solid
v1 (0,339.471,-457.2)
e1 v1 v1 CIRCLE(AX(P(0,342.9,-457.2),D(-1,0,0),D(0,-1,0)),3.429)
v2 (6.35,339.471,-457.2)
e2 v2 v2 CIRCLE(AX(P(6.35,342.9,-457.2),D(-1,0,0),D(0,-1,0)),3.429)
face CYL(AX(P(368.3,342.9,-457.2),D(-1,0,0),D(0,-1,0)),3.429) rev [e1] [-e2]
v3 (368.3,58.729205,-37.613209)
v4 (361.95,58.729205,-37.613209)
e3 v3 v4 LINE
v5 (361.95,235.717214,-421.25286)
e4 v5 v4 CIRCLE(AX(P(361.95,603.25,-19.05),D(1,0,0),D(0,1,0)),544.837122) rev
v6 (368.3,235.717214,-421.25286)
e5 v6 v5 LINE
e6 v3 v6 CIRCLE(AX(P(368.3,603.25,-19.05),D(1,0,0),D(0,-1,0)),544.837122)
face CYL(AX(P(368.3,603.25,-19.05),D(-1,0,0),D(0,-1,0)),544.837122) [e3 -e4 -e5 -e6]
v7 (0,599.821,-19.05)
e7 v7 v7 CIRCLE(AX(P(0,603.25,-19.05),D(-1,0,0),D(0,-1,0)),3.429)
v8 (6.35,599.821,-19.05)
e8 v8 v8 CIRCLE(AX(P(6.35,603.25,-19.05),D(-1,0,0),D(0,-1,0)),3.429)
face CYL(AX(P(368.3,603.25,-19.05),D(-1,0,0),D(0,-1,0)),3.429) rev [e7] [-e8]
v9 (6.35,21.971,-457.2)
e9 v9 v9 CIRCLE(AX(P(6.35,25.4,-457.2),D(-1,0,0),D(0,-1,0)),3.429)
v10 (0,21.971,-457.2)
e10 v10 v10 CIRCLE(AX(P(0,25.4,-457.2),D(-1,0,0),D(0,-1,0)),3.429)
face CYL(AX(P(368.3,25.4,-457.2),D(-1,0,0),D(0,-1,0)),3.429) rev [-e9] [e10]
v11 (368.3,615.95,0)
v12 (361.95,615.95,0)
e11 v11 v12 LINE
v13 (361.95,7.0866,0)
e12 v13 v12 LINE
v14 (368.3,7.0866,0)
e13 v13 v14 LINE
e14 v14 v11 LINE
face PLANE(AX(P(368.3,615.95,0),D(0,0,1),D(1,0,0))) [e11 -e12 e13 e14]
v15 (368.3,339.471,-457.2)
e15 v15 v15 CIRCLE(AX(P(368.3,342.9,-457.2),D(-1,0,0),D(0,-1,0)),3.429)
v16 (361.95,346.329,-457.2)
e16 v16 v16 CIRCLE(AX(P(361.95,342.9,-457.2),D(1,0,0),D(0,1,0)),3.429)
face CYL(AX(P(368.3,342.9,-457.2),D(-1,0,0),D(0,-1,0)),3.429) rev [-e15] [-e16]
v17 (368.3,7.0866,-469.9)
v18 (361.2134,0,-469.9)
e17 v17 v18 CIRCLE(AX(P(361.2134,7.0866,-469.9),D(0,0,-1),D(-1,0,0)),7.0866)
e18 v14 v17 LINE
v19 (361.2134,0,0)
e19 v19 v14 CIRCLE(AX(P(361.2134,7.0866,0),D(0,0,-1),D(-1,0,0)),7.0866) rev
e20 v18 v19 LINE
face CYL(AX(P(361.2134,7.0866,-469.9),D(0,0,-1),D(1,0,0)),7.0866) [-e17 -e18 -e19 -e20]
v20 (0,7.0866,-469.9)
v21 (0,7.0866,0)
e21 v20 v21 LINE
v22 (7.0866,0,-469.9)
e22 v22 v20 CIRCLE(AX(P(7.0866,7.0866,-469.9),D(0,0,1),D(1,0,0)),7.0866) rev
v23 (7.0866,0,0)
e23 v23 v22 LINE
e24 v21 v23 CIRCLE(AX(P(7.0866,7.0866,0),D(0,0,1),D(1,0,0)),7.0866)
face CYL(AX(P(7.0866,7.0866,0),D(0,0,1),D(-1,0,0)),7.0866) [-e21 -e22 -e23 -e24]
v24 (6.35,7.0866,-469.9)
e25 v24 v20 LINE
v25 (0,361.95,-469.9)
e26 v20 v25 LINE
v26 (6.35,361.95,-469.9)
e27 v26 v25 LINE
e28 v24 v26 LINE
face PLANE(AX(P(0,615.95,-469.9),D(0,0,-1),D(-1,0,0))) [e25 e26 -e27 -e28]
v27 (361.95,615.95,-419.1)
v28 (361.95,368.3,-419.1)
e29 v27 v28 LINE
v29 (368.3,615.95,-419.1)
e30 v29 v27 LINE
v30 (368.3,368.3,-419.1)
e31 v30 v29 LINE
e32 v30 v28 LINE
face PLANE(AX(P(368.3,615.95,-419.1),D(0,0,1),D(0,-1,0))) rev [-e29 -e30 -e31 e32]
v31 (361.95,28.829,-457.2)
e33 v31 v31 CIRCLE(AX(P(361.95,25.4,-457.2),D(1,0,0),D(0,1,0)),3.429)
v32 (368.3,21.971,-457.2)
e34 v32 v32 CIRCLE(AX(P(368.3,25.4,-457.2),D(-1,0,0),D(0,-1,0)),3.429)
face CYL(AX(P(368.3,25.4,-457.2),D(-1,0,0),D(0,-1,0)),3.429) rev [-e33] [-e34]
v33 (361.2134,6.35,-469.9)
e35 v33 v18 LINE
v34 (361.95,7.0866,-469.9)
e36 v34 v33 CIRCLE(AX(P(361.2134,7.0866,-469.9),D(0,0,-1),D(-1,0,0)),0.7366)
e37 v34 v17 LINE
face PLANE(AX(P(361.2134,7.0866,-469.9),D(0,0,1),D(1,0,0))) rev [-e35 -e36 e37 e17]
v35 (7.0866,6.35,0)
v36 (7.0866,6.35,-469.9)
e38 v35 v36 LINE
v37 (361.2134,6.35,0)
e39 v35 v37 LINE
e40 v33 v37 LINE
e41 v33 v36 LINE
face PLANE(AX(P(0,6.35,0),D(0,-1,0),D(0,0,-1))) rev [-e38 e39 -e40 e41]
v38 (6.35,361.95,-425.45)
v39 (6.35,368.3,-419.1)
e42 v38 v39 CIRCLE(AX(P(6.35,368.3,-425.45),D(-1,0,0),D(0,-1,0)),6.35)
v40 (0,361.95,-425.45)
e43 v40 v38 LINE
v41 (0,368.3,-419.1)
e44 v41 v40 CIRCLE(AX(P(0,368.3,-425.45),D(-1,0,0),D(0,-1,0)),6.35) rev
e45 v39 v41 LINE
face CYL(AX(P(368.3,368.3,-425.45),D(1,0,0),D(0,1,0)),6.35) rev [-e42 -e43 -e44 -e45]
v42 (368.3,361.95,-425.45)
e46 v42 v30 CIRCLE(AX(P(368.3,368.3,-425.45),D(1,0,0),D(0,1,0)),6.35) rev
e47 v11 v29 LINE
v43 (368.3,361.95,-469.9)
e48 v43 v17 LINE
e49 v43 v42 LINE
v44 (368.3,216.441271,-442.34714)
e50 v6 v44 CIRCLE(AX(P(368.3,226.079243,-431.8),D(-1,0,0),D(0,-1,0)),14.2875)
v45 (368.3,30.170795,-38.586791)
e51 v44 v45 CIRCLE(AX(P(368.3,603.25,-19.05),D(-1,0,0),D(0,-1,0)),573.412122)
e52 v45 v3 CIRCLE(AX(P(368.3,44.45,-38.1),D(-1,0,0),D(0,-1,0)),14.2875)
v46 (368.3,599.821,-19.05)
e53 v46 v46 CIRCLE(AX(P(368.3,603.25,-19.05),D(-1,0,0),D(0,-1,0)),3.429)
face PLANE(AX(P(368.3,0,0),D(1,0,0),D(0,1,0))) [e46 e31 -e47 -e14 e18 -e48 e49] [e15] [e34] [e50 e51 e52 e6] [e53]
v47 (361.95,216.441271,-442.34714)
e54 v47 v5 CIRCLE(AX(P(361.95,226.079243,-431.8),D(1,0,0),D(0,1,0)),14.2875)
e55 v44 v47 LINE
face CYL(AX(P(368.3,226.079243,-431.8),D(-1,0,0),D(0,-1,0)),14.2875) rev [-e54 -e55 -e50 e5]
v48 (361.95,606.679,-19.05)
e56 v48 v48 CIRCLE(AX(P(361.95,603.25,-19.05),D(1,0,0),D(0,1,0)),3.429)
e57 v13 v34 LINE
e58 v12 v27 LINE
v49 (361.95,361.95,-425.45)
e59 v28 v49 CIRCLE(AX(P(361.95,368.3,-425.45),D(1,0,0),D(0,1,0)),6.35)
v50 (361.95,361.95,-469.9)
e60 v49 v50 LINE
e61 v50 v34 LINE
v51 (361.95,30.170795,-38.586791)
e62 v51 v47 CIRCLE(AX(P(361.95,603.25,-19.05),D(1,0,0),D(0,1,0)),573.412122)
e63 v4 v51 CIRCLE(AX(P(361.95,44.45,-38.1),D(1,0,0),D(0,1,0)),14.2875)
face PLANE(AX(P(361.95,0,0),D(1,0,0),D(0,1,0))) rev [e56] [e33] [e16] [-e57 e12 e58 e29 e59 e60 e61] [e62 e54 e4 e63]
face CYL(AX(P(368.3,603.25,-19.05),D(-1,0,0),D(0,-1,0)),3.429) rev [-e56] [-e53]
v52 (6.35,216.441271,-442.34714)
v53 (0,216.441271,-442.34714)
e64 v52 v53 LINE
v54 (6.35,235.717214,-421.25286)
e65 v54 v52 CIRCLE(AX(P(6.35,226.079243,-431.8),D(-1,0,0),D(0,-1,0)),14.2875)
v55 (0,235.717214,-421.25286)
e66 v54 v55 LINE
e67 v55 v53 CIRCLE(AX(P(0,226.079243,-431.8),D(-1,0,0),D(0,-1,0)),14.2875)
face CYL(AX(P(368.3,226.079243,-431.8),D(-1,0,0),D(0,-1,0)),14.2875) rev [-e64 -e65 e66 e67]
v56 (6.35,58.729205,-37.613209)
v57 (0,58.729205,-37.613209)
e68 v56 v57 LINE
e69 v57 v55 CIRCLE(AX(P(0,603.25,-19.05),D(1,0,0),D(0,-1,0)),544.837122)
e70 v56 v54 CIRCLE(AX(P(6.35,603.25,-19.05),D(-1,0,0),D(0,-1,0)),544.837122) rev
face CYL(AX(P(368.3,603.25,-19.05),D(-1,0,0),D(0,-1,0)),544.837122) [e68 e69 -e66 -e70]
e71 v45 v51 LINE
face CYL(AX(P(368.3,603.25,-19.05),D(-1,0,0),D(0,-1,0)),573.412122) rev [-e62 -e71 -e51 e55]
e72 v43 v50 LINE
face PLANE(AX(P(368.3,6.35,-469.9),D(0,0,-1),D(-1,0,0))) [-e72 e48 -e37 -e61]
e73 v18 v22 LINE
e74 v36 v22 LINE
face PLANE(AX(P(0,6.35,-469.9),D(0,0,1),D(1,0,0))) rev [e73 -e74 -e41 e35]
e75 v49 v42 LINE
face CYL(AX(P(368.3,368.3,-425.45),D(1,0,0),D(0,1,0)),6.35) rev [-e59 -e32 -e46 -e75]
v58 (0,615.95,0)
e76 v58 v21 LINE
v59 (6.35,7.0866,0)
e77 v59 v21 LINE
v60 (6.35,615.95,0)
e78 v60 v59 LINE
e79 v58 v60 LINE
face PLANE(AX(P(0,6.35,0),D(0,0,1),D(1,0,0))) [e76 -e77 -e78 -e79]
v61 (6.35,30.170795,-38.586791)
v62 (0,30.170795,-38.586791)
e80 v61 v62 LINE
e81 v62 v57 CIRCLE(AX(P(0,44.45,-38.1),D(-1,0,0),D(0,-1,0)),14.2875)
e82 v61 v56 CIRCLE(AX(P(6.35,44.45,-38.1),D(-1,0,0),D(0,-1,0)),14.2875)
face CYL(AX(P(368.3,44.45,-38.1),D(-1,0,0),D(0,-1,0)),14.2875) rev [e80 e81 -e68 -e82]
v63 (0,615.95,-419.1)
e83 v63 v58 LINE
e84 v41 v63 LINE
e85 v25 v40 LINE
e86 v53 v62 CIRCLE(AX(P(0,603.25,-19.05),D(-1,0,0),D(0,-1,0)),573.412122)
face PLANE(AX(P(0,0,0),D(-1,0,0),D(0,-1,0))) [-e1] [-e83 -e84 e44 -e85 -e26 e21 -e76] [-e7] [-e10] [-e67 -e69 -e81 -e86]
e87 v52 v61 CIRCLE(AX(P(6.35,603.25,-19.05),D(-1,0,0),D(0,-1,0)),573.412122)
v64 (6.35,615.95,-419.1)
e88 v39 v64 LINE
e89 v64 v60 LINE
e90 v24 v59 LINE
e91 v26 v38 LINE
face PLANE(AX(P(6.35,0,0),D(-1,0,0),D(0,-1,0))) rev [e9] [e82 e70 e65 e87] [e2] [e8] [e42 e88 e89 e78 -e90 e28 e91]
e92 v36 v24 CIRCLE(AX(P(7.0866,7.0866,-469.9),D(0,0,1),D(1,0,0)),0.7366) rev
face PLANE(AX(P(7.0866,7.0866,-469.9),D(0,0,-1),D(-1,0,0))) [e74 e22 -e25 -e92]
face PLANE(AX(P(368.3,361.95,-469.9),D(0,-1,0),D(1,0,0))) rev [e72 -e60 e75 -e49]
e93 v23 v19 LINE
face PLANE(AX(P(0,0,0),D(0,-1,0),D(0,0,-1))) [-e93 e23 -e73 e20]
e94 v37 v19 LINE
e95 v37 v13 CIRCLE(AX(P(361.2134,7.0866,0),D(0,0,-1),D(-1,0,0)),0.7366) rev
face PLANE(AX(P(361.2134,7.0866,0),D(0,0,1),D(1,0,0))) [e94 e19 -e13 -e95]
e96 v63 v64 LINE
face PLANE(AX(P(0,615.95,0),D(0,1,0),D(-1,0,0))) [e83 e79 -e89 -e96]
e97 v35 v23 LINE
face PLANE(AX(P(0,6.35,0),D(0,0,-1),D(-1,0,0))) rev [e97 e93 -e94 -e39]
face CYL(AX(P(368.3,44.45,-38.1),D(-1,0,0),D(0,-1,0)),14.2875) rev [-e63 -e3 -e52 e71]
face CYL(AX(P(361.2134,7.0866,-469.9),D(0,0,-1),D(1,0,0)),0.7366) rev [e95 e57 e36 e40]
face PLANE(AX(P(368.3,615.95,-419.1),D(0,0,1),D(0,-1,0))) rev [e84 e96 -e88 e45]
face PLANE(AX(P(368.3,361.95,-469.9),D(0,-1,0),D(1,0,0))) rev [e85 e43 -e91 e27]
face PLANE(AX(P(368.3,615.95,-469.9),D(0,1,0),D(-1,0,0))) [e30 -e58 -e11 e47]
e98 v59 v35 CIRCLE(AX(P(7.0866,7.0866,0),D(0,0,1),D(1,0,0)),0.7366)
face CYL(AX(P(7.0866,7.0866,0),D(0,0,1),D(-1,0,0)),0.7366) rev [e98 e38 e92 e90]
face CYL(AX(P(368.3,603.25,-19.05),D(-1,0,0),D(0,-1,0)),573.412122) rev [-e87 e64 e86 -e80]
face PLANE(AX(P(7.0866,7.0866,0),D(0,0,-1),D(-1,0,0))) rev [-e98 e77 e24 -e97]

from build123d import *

# Parameters (mm, degrees)
SKETCH1_W                    = 368.3
SKETCH1_H                    = 469.9
BASE_FLANGE1_DEPTH           = 6.35
EDGE_FLANGE1_STRIP_W         = 26.8732
EDGE_FLANGE1_STRIP_H         = 6.35
EDGE_FLANGE1_STRIP_CUT_DEPTH = 469.9
EDGE_FLANGE1_DEPTH           = 469.9
EDGE_FLANGE2_STRIP_W         = 26.8732
EDGE_FLANGE2_STRIP_H         = 6.35
EDGE_FLANGE2_STRIP_CUT_DEPTH = 469.9
EDGE_FLANGE2_DEPTH           = 469.9
SKETCH14_R                   = 3.429
SKETCH14_W                   = 50.8
SKETCH14_H                   = 254
CUT_EXTRUDE1_DEPTH           = 858.814258741
FILLET1_R                    = 6.35
CUT_EXTRUDE2_DEPTH           = 858.814258741


# Sheet-metal steps are written as plain solids
with BuildPart() as part:
    # Sketch1 → Base-Flange1 (new body)
    with BuildSketch(Plane(origin=(0, 0, 0), x_dir=(1, 0, 0), z_dir=(0, 1, 0))):
        with Locations((184.15, 234.95)):
            Rectangle(SKETCH1_W, SKETCH1_H)
    extrude(amount=BASE_FLANGE1_DEPTH)

    # Edge-Flange1 strip (across the edge) → Edge-Flange1 strip cut (cut)
    with BuildSketch(Plane(origin=(368.3, 6.35, 0), x_dir=(-1, 0, 0), z_dir=(0, 0, -1))):
        with Locations((-6.35, -3.175)):
            Rectangle(EDGE_FLANGE1_STRIP_W, EDGE_FLANGE1_STRIP_H)
    extrude(amount=EDGE_FLANGE1_STRIP_CUT_DEPTH, mode=Mode.SUBTRACT)

    # Edge-Flange1 section (across the edge) → Edge-Flange1 (add)
    with BuildSketch(Plane(origin=(368.3, 6.35, 0), x_dir=(-1, 0, 0), z_dir=(0, 0, -1))):
        with BuildLine():
            Line((0, 0.7366), (0, 609.6))
            Line((0, 609.6), (6.35, 609.6))
            Line((6.35, 609.6), (6.35, 0.7366))
            ThreePointArc((6.35, 0.7366), (6.565745145, 0.215745145), (7.0866, 0))
            Line((7.0866, 0), (7.0866, -6.35))
            ThreePointArc((7.0866, -6.35), (2.075617084, -4.274382916), (0, 0.7366))
        make_face()
    extrude(amount=EDGE_FLANGE1_DEPTH)

    # Edge-Flange2 strip (across the edge) → Edge-Flange2 strip cut (cut)
    with BuildSketch(Plane(origin=(0, 6.35, -469.9), x_dir=(1, 0, 0), z_dir=(0, 0, 1))):
        with Locations((-6.35, -3.175)):
            Rectangle(EDGE_FLANGE2_STRIP_W, EDGE_FLANGE2_STRIP_H)
    extrude(amount=EDGE_FLANGE2_STRIP_CUT_DEPTH, mode=Mode.SUBTRACT)

    # Edge-Flange2 section (across the edge) → Edge-Flange2 (add)
    with BuildSketch(Plane(origin=(0, 6.35, -469.9), x_dir=(1, 0, 0), z_dir=(0, 0, 1))):
        with BuildLine():
            Line((0, 0.7366), (0, 609.6))
            Line((0, 609.6), (6.35, 609.6))
            Line((6.35, 609.6), (6.35, 0.7366))
            ThreePointArc((6.35, 0.7366), (6.565745145, 0.215745145), (7.0866, 0))
            Line((7.0866, 0), (7.0866, -6.35))
            ThreePointArc((7.0866, -6.35), (2.075617084, -4.274382916), (0, 0.7366))
        make_face()
    extrude(amount=EDGE_FLANGE2_DEPTH)

    # Sketch14 → Cut-Extrude1 (cut, through all)
    with BuildSketch(Plane.ZY):
        with Locations(Location((-19.05, 603.25, 0), (0, 0, 270))):
            Circle(SKETCH14_R)
        with Locations(Location((-457.2, 342.9, 0), (0, 0, 270))):
            Circle(SKETCH14_R)
        with Locations(Location((-457.2, 25.4, 0), (0, 0, 270))):
            Circle(SKETCH14_R)
        with Locations((-444.5, 488.95)):
            Rectangle(SKETCH14_W, SKETCH14_H)
    extrude(amount=-CUT_EXTRUDE1_DEPTH, mode=Mode.SUBTRACT)

    # Fillet1
    fillet1_edges = [part.edges().sort_by_distance(p)[0] for p in [
        (365.125, 361.95, -419.1),
        (3.175, 361.95, -419.1),
    ]]
    fillet(fillet1_edges, radius=FILLET1_R)

    # Sketch15 → Cut-Extrude2 (cut, through all)
    with BuildSketch(Plane.ZY):
        with BuildLine():
            ThreePointArc((-421.252860066, 235.717214458), (-247.287179467, 108.52252047), (-37.613208926, 58.729204834))
            ThreePointArc((-37.613208926, 58.729204834), (-23.820795166, 43.963208926), (-38.586791074, 30.170795166))
            ThreePointArc((-38.586791074, 30.170795166), (-259.257504441, 82.575614199), (-442.347139934, 216.441271373))
            ThreePointArc((-442.347139934, 216.441271373), (-441.437971542, 236.62638285), (-421.252860066, 235.717214458))
        make_face()
    extrude(amount=-CUT_EXTRUDE2_DEPTH, mode=Mode.SUBTRACT)


solid = part.part
